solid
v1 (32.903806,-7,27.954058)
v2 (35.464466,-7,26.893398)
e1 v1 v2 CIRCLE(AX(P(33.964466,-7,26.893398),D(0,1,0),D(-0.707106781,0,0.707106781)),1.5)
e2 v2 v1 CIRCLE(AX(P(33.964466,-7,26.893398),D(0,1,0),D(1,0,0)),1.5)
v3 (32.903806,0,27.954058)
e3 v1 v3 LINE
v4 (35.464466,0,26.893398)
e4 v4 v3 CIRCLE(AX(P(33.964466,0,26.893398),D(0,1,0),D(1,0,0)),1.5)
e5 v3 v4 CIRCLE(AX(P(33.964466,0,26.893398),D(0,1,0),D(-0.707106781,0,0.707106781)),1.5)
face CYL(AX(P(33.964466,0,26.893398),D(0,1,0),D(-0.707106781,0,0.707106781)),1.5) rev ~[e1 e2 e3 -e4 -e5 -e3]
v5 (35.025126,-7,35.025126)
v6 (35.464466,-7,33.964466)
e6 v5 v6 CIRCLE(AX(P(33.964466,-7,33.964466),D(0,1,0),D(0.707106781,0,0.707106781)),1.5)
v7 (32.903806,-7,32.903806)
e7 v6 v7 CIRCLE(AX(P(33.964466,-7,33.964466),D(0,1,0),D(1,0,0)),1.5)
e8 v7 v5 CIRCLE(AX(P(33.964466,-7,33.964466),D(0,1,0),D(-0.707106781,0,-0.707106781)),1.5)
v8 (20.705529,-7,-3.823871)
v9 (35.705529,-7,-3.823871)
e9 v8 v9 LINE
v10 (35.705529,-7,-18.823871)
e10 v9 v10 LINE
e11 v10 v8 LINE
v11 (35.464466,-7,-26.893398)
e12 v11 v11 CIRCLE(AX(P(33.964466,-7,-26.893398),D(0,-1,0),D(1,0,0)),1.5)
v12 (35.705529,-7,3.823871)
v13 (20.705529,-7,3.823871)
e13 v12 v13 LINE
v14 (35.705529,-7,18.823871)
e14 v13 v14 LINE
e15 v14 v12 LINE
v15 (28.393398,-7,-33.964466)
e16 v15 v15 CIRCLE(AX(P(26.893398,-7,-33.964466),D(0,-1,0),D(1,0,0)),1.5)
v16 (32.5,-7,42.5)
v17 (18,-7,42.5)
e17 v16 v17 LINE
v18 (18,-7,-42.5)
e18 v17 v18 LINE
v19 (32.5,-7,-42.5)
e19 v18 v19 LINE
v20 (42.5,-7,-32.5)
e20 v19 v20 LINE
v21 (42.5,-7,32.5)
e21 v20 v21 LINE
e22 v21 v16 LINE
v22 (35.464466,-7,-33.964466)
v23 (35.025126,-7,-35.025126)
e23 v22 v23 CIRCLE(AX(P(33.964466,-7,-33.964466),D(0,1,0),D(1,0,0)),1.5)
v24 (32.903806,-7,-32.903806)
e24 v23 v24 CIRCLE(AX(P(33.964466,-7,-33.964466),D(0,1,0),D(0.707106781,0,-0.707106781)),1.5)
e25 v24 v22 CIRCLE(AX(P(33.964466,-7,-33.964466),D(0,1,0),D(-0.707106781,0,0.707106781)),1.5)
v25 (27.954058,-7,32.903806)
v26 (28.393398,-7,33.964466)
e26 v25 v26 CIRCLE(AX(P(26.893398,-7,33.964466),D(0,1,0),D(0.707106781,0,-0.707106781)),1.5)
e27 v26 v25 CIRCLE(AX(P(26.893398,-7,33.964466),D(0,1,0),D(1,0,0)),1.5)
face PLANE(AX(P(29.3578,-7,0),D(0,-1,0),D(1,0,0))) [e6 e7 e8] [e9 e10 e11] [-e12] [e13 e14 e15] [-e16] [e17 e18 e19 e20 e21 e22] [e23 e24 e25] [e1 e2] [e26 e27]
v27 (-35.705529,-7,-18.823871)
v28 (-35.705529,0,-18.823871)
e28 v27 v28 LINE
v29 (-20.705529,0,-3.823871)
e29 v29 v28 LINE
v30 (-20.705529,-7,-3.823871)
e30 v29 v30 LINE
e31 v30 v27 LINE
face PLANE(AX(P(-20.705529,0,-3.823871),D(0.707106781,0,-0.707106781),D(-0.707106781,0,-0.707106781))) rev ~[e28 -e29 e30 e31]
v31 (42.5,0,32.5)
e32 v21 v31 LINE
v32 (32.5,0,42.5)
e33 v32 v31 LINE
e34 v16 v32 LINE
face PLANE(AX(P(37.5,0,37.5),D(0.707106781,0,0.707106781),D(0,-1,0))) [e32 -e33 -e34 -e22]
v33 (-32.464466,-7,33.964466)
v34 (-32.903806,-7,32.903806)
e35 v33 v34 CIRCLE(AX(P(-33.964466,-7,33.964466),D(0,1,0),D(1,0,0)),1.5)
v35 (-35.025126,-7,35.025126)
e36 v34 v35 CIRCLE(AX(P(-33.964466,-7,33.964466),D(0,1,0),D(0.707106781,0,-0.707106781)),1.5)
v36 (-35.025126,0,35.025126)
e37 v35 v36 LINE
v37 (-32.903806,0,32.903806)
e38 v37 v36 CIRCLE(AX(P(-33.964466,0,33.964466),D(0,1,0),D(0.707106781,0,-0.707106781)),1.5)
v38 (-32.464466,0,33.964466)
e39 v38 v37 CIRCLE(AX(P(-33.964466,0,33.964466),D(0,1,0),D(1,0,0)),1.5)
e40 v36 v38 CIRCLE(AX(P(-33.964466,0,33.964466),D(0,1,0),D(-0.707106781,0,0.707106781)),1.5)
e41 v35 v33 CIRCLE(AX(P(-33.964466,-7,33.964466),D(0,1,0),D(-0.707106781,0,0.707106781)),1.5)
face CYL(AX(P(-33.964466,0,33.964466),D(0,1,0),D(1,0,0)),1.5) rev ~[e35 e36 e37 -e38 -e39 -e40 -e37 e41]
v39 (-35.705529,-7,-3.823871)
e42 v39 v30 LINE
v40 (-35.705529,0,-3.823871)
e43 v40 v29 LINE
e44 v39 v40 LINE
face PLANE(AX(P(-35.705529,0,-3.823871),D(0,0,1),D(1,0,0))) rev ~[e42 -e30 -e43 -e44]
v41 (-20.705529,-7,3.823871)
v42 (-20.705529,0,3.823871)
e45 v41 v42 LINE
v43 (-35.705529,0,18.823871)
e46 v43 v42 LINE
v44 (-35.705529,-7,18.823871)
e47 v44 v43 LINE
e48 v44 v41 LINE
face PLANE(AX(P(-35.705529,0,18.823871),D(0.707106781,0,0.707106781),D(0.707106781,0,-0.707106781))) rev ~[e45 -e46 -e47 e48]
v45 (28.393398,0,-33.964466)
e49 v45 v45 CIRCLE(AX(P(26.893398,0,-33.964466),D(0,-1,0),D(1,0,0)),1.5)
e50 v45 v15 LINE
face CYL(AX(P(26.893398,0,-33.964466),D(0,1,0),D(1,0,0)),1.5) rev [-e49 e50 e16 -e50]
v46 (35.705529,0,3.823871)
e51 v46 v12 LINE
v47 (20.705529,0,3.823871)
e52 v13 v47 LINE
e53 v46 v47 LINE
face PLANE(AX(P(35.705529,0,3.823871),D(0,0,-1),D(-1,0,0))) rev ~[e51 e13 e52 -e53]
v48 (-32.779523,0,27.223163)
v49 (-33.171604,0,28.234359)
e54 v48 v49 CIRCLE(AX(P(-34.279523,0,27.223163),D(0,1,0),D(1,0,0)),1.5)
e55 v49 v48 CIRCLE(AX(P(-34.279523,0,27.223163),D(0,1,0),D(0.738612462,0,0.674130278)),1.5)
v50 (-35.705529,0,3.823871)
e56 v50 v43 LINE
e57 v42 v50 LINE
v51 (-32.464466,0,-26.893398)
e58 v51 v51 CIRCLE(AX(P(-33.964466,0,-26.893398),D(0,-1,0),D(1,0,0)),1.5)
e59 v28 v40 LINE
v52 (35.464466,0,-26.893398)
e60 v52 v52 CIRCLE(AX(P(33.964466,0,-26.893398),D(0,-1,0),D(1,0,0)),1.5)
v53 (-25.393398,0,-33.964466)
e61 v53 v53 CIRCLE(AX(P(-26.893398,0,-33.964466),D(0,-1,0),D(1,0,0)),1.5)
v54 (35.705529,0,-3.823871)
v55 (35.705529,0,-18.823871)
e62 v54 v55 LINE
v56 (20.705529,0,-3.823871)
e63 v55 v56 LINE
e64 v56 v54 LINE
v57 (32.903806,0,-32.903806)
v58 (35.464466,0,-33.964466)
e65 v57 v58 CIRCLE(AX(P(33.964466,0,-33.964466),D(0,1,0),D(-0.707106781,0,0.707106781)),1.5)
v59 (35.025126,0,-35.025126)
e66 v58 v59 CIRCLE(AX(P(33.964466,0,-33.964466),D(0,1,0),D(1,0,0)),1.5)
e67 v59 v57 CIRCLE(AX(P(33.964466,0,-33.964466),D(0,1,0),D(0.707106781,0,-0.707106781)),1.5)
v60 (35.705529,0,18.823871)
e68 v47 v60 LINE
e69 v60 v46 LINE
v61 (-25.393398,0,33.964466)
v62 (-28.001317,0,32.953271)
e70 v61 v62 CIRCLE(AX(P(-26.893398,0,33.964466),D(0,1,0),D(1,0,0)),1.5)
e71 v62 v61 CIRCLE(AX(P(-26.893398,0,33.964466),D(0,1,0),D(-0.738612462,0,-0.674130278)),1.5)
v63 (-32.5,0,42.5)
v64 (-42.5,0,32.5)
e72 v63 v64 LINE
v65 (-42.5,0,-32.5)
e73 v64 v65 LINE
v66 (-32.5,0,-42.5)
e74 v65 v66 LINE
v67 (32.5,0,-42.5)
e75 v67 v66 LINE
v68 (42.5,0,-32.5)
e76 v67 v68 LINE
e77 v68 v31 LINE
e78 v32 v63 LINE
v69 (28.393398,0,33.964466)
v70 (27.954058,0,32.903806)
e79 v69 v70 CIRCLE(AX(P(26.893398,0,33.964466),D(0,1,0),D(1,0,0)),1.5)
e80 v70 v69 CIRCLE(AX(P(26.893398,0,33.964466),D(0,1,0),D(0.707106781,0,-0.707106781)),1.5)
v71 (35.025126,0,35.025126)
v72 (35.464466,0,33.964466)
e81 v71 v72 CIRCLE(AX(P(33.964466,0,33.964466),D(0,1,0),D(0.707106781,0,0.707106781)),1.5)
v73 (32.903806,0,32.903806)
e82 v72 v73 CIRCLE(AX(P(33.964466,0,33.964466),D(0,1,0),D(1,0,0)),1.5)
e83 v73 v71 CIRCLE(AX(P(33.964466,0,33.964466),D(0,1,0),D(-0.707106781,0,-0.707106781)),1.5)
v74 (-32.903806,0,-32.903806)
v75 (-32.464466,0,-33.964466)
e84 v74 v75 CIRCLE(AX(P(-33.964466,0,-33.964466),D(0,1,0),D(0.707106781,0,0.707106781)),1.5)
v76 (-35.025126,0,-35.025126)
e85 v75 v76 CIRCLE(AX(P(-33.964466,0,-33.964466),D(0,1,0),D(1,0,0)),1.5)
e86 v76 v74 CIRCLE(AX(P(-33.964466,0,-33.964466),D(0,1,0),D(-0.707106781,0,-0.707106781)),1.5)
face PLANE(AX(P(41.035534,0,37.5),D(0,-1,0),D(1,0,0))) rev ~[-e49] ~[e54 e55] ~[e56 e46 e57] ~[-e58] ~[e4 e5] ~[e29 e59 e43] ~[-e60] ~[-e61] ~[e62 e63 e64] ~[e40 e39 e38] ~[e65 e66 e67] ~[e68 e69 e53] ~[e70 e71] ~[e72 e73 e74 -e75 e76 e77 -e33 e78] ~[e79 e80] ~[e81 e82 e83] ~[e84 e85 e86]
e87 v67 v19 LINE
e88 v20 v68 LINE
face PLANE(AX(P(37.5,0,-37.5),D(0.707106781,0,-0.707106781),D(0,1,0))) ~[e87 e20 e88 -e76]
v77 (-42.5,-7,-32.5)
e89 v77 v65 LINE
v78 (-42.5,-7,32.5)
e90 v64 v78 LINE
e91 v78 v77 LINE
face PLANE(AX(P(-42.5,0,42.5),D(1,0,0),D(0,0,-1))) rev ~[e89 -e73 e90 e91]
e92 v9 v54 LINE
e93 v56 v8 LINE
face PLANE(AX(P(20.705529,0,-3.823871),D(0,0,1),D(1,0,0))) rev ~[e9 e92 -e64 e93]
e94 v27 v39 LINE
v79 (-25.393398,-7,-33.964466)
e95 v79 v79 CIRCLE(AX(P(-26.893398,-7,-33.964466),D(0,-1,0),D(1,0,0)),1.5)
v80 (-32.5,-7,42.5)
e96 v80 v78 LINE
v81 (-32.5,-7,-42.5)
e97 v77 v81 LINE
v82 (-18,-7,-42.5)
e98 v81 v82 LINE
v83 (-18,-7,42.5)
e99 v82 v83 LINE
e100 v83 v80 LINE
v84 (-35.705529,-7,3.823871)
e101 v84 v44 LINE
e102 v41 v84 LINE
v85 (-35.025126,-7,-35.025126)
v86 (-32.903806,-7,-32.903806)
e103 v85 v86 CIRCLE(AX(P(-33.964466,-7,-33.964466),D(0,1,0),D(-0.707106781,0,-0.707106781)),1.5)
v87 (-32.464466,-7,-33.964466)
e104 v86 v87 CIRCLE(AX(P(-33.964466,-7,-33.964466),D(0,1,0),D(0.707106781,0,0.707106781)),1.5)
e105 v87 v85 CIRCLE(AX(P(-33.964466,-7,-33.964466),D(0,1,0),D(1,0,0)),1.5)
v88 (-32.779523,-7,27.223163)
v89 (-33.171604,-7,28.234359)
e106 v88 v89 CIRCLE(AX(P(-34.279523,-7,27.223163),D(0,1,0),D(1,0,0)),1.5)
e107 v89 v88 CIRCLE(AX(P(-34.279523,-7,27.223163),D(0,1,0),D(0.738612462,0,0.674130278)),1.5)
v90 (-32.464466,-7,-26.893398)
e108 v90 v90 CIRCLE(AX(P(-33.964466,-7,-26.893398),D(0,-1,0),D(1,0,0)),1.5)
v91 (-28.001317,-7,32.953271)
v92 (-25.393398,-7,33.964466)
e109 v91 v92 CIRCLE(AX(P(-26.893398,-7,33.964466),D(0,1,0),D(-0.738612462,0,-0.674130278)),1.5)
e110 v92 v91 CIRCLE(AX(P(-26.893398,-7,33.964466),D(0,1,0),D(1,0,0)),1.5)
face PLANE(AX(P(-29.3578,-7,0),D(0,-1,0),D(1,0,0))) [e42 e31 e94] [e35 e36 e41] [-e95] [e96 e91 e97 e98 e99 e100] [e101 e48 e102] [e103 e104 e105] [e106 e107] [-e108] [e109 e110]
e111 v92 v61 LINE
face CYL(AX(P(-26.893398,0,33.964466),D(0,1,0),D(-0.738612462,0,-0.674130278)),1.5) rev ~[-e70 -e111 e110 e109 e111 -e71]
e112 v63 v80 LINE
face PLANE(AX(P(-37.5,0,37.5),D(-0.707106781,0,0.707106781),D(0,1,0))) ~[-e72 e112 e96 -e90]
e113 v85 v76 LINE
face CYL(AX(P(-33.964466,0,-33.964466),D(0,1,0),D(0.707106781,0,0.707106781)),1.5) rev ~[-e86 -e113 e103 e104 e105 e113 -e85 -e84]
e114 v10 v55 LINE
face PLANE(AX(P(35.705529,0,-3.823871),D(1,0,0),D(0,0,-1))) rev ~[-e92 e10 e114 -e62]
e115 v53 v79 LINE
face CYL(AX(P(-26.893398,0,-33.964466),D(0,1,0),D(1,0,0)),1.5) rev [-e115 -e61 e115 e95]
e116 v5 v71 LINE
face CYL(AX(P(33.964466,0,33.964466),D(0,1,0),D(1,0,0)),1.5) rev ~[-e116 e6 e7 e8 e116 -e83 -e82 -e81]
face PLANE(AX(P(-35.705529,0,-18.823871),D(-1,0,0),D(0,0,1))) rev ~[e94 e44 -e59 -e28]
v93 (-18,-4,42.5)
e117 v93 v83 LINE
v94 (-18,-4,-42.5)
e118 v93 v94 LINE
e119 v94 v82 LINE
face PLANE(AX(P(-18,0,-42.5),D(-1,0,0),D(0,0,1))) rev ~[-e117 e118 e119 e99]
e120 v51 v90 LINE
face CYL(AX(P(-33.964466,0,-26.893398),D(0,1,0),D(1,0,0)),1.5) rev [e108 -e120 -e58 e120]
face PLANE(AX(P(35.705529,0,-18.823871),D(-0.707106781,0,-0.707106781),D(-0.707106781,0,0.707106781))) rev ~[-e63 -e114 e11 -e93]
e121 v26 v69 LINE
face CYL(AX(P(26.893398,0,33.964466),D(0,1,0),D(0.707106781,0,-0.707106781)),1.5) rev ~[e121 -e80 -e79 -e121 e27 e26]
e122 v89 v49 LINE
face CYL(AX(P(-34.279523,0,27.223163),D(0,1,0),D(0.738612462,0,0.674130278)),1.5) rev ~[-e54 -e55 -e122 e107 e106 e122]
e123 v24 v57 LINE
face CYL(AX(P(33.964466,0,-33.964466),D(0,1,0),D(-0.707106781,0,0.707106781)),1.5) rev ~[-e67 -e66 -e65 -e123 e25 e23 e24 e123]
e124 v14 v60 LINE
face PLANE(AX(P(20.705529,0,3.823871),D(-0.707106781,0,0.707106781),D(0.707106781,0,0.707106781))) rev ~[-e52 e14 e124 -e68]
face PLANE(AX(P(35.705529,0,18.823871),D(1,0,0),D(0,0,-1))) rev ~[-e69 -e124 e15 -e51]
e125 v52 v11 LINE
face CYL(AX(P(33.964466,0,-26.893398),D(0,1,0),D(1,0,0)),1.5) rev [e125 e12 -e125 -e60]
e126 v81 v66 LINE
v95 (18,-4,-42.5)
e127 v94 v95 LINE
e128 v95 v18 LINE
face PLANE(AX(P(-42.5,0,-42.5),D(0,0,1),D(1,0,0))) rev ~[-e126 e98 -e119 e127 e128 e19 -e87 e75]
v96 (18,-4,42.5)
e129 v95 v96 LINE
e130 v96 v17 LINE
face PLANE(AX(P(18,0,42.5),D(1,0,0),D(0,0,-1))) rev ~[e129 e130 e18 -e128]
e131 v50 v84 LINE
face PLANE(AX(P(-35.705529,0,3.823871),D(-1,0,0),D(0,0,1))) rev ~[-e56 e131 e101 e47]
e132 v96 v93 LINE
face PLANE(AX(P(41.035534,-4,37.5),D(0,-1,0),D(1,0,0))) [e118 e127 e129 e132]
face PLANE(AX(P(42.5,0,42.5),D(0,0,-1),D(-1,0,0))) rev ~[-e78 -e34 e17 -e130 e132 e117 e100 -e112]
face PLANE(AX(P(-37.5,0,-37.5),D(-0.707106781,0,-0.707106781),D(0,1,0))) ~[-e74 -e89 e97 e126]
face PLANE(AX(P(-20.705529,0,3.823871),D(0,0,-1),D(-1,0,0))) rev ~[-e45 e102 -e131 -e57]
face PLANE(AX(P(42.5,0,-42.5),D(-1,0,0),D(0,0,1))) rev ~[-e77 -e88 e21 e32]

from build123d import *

# Parameters (mm, degrees)
F0_R     = 1.5
F0_W     = 36
F0_H     = 85
F1_DEPTH = 4
F2_SIZE  = 10
F3_DEPTH = 7


with BuildPart() as f1:
    # F0 (on Front) → F1 (new body)
    with BuildSketch(Plane.XZ):
        Polygon((42.5, 32.5), (42.5, 42.5), (37.5, 37.5), align=None)
        Polygon((37.5, 37.5), (42.5, 42.5), (32.5, 42.5), align=None)
        Polygon((42.5, -32.5), (42.5, 32.5), (37.5, 37.5), (32.5, 42.5), (18, 42.5), (18, -42.5), (32.5, -42.5), (37.5, -37.5), align=None)
        with Locations((26.8933982822, -33.9644660941)):
            Circle(F0_R, mode=Mode.SUBTRACT)
        with BuildLine():
            ThreePointArc((35.4644660941, -33.9644660941), (35.3502853928, -34.5384912426), (35.0251262658, -35.0251262658))
            ThreePointArc((35.0251262658, -35.0251262658), (32.9038059223, -35.0251262658), (32.9038059223, -32.9038059223))
            ThreePointArc((32.9038059223, -32.9038059223), (34.5384912426, -32.5786467953), (35.4644660941, -33.9644660941))
        make_face(mode=Mode.SUBTRACT)
        with Locations((33.9644660941, -26.8933982822)):
            Circle(F0_R, mode=Mode.SUBTRACT)
        Polygon((20.7055291533, -3.823871389), (35.7055291533, -3.823871389), (35.7055291533, -18.823871389), align=None, mode=Mode.SUBTRACT)
        Polygon((35.7055291533, 3.823871389), (20.7055291533, 3.823871389), (35.7055291533, 18.823871389), align=None, mode=Mode.SUBTRACT)
        with BuildLine():
            ThreePointArc((35.4644660941, 26.8933982822), (33.3904409455, 25.5075789834), (32.9038059223, 27.954058454))
            ThreePointArc((32.9038059223, 27.954058454), (34.5384912426, 28.279217581), (35.4644660941, 26.8933982822))
        make_face(mode=Mode.SUBTRACT)
        with BuildLine():
            ThreePointArc((28.3933982822, 33.9644660941), (28.279217581, 33.3904409455), (27.954058454, 32.9038059223))
            ThreePointArc((27.954058454, 32.9038059223), (25.5075789834, 34.5384912426), (28.3933982822, 33.9644660941))
        make_face(mode=Mode.SUBTRACT)
        with BuildLine():
            ThreePointArc((32.9038059223, 32.9038059223), (32.9038059223, 35.0251262658), (35.0251262658, 35.0251262658))
            ThreePointArc((35.0251262658, 35.0251262658), (35.3502853928, 34.5384912426), (35.4644660941, 33.9644660941))
            ThreePointArc((35.4644660941, 33.9644660941), (34.5384912426, 32.5786467953), (32.9038059223, 32.9038059223))
        make_face(mode=Mode.SUBTRACT)
        Polygon((42.5, -42.5), (42.5, -32.5), (37.5, -37.5), align=None)
        Rectangle(F0_W, F0_H)
        Polygon((32.5, -42.5), (42.5, -42.5), (37.5, -37.5), align=None)
        Polygon((-18, -42.5), (-18, 42.5), (-32.5, 42.5), (-37.5, 37.5), (-42.5, 32.5), (-42.5, -32.5), (-37.5, -37.5), (-32.5, -42.5), align=None)
        with BuildLine():
            ThreePointArc((-32.4644660941, -33.9644660941), (-33.3904409455, -35.3502853928), (-35.0251262658, -35.0251262658))
            ThreePointArc((-35.0251262658, -35.0251262658), (-35.0251262658, -32.9038059223), (-32.9038059223, -32.9038059223))
            ThreePointArc((-32.9038059223, -32.9038059223), (-32.5786467953, -33.3904409455), (-32.4644660941, -33.9644660941))
        make_face(mode=Mode.SUBTRACT)
        with Locations((-26.8933982822, -33.9644660941)):
            Circle(F0_R, mode=Mode.SUBTRACT)
        with Locations((-33.9644660941, -26.8933982822)):
            Circle(F0_R, mode=Mode.SUBTRACT)
        Polygon((-20.7055291533, -3.823871389), (-35.7055291533, -18.823871389), (-35.7055291533, -3.823871389), align=None, mode=Mode.SUBTRACT)
        Polygon((-35.7055291533, 3.823871389), (-35.7055291533, 18.823871389), (-20.7055291533, 3.823871389), align=None, mode=Mode.SUBTRACT)
        with BuildLine():
            ThreePointArc((-32.7795228992, 27.2231633162), (-35.6780717969, 26.6808894181), (-33.1716042066, 28.2343587329))
            ThreePointArc((-33.1716042066, 28.2343587329), (-32.8809740014, 27.7654372144), (-32.7795228992, 27.2231633162))
        make_face(mode=Mode.SUBTRACT)
        with BuildLine():
            ThreePointArc((-32.9038059223, 32.9038059223), (-35.0251262658, 32.9038059223), (-35.0251262658, 35.0251262658))
            ThreePointArc((-35.0251262658, 35.0251262658), (-33.3904409455, 35.3502853928), (-32.4644660941, 33.9644660941))
            ThreePointArc((-32.4644660941, 33.9644660941), (-32.5786467953, 33.3904409455), (-32.9038059223, 32.9038059223))
        make_face(mode=Mode.SUBTRACT)
        with BuildLine():
            ThreePointArc((-25.3933982822, 33.9644660941), (-26.3511243841, 32.5659171963), (-28.0013169747, 32.9532706774))
            ThreePointArc((-28.0013169747, 32.9532706774), (-27.4356721803, 35.3630149918), (-25.3933982822, 33.9644660941))
        make_face(mode=Mode.SUBTRACT)
        Polygon((-37.5, 37.5), (-32.5, 42.5), (-42.5, 42.5), align=None)
        Polygon((-42.5, 32.5), (-37.5, 37.5), (-42.5, 42.5), align=None)
        Polygon((-42.5, -42.5), (-32.5, -42.5), (-37.5, -37.5), align=None)
        Polygon((-42.5, -42.5), (-37.5, -37.5), (-42.5, -32.5), align=None)
    extrude(amount=F1_DEPTH)

    # F2
    f2_edges = [f1.edges().sort_by_distance(p)[0] for p in [
        (42.5, -2, 42.5),
        (-42.5, -2, 42.5),
        (-42.5, -2, -42.5),
        (42.5, -2, -42.5),
    ]]
    chamfer(f2_edges, length=F2_SIZE)

    # F0 (on Front) → F3 (join)
    with BuildSketch(Plane.XZ):
        Polygon((-18, -42.5), (-18, 42.5), (-32.5, 42.5), (-37.5, 37.5), (-42.5, 32.5), (-42.5, -32.5), (-37.5, -37.5), (-32.5, -42.5), align=None)
        with BuildLine():
            ThreePointArc((-32.4644660941, -33.9644660941), (-33.3904409455, -35.3502853928), (-35.0251262658, -35.0251262658))
            ThreePointArc((-35.0251262658, -35.0251262658), (-35.0251262658, -32.9038059223), (-32.9038059223, -32.9038059223))
            ThreePointArc((-32.9038059223, -32.9038059223), (-32.5786467953, -33.3904409455), (-32.4644660941, -33.9644660941))
        make_face(mode=Mode.SUBTRACT)
        with Locations((-26.8933982822, -33.9644660941)):
            Circle(F0_R, mode=Mode.SUBTRACT)
        with Locations((-33.9644660941, -26.8933982822)):
            Circle(F0_R, mode=Mode.SUBTRACT)
        Polygon((-20.7055291533, -3.823871389), (-35.7055291533, -18.823871389), (-35.7055291533, -3.823871389), align=None, mode=Mode.SUBTRACT)
        Polygon((-35.7055291533, 3.823871389), (-35.7055291533, 18.823871389), (-20.7055291533, 3.823871389), align=None, mode=Mode.SUBTRACT)
        with BuildLine():
            ThreePointArc((-32.7795228992, 27.2231633162), (-35.6780717969, 26.6808894181), (-33.1716042066, 28.2343587329))
            ThreePointArc((-33.1716042066, 28.2343587329), (-32.8809740014, 27.7654372144), (-32.7795228992, 27.2231633162))
        make_face(mode=Mode.SUBTRACT)
        with BuildLine():
            ThreePointArc((-32.9038059223, 32.9038059223), (-35.0251262658, 32.9038059223), (-35.0251262658, 35.0251262658))
            ThreePointArc((-35.0251262658, 35.0251262658), (-33.3904409455, 35.3502853928), (-32.4644660941, 33.9644660941))
            ThreePointArc((-32.4644660941, 33.9644660941), (-32.5786467953, 33.3904409455), (-32.9038059223, 32.9038059223))
        make_face(mode=Mode.SUBTRACT)
        with BuildLine():
            ThreePointArc((-25.3933982822, 33.9644660941), (-26.3511243841, 32.5659171963), (-28.0013169747, 32.9532706774))
            ThreePointArc((-28.0013169747, 32.9532706774), (-27.4356721803, 35.3630149918), (-25.3933982822, 33.9644660941))
        make_face(mode=Mode.SUBTRACT)
        Polygon((42.5, -32.5), (42.5, 32.5), (37.5, 37.5), (32.5, 42.5), (18, 42.5), (18, -42.5), (32.5, -42.5), (37.5, -37.5), align=None)
        with Locations((26.8933982822, -33.9644660941)):
            Circle(F0_R, mode=Mode.SUBTRACT)
        with BuildLine():
            ThreePointArc((35.4644660941, -33.9644660941), (35.3502853928, -34.5384912426), (35.0251262658, -35.0251262658))
            ThreePointArc((35.0251262658, -35.0251262658), (32.9038059223, -35.0251262658), (32.9038059223, -32.9038059223))
            ThreePointArc((32.9038059223, -32.9038059223), (34.5384912426, -32.5786467953), (35.4644660941, -33.9644660941))
        make_face(mode=Mode.SUBTRACT)
        with Locations((33.9644660941, -26.8933982822)):
            Circle(F0_R, mode=Mode.SUBTRACT)
        Polygon((20.7055291533, -3.823871389), (35.7055291533, -3.823871389), (35.7055291533, -18.823871389), align=None, mode=Mode.SUBTRACT)
        Polygon((35.7055291533, 3.823871389), (20.7055291533, 3.823871389), (35.7055291533, 18.823871389), align=None, mode=Mode.SUBTRACT)
        with BuildLine():
            ThreePointArc((35.4644660941, 26.8933982822), (33.3904409455, 25.5075789834), (32.9038059223, 27.954058454))
            ThreePointArc((32.9038059223, 27.954058454), (34.5384912426, 28.279217581), (35.4644660941, 26.8933982822))
        make_face(mode=Mode.SUBTRACT)
        with BuildLine():
            ThreePointArc((28.3933982822, 33.9644660941), (28.279217581, 33.3904409455), (27.954058454, 32.9038059223))
            ThreePointArc((27.954058454, 32.9038059223), (25.5075789834, 34.5384912426), (28.3933982822, 33.9644660941))
        make_face(mode=Mode.SUBTRACT)
        with BuildLine():
            ThreePointArc((32.9038059223, 32.9038059223), (32.9038059223, 35.0251262658), (35.0251262658, 35.0251262658))
            ThreePointArc((35.0251262658, 35.0251262658), (35.3502853928, 34.5384912426), (35.4644660941, 33.9644660941))
            ThreePointArc((35.4644660941, 33.9644660941), (34.5384912426, 32.5786467953), (32.9038059223, 32.9038059223))
        make_face(mode=Mode.SUBTRACT)
    extrude(amount=F3_DEPTH)


solid = f1.part
